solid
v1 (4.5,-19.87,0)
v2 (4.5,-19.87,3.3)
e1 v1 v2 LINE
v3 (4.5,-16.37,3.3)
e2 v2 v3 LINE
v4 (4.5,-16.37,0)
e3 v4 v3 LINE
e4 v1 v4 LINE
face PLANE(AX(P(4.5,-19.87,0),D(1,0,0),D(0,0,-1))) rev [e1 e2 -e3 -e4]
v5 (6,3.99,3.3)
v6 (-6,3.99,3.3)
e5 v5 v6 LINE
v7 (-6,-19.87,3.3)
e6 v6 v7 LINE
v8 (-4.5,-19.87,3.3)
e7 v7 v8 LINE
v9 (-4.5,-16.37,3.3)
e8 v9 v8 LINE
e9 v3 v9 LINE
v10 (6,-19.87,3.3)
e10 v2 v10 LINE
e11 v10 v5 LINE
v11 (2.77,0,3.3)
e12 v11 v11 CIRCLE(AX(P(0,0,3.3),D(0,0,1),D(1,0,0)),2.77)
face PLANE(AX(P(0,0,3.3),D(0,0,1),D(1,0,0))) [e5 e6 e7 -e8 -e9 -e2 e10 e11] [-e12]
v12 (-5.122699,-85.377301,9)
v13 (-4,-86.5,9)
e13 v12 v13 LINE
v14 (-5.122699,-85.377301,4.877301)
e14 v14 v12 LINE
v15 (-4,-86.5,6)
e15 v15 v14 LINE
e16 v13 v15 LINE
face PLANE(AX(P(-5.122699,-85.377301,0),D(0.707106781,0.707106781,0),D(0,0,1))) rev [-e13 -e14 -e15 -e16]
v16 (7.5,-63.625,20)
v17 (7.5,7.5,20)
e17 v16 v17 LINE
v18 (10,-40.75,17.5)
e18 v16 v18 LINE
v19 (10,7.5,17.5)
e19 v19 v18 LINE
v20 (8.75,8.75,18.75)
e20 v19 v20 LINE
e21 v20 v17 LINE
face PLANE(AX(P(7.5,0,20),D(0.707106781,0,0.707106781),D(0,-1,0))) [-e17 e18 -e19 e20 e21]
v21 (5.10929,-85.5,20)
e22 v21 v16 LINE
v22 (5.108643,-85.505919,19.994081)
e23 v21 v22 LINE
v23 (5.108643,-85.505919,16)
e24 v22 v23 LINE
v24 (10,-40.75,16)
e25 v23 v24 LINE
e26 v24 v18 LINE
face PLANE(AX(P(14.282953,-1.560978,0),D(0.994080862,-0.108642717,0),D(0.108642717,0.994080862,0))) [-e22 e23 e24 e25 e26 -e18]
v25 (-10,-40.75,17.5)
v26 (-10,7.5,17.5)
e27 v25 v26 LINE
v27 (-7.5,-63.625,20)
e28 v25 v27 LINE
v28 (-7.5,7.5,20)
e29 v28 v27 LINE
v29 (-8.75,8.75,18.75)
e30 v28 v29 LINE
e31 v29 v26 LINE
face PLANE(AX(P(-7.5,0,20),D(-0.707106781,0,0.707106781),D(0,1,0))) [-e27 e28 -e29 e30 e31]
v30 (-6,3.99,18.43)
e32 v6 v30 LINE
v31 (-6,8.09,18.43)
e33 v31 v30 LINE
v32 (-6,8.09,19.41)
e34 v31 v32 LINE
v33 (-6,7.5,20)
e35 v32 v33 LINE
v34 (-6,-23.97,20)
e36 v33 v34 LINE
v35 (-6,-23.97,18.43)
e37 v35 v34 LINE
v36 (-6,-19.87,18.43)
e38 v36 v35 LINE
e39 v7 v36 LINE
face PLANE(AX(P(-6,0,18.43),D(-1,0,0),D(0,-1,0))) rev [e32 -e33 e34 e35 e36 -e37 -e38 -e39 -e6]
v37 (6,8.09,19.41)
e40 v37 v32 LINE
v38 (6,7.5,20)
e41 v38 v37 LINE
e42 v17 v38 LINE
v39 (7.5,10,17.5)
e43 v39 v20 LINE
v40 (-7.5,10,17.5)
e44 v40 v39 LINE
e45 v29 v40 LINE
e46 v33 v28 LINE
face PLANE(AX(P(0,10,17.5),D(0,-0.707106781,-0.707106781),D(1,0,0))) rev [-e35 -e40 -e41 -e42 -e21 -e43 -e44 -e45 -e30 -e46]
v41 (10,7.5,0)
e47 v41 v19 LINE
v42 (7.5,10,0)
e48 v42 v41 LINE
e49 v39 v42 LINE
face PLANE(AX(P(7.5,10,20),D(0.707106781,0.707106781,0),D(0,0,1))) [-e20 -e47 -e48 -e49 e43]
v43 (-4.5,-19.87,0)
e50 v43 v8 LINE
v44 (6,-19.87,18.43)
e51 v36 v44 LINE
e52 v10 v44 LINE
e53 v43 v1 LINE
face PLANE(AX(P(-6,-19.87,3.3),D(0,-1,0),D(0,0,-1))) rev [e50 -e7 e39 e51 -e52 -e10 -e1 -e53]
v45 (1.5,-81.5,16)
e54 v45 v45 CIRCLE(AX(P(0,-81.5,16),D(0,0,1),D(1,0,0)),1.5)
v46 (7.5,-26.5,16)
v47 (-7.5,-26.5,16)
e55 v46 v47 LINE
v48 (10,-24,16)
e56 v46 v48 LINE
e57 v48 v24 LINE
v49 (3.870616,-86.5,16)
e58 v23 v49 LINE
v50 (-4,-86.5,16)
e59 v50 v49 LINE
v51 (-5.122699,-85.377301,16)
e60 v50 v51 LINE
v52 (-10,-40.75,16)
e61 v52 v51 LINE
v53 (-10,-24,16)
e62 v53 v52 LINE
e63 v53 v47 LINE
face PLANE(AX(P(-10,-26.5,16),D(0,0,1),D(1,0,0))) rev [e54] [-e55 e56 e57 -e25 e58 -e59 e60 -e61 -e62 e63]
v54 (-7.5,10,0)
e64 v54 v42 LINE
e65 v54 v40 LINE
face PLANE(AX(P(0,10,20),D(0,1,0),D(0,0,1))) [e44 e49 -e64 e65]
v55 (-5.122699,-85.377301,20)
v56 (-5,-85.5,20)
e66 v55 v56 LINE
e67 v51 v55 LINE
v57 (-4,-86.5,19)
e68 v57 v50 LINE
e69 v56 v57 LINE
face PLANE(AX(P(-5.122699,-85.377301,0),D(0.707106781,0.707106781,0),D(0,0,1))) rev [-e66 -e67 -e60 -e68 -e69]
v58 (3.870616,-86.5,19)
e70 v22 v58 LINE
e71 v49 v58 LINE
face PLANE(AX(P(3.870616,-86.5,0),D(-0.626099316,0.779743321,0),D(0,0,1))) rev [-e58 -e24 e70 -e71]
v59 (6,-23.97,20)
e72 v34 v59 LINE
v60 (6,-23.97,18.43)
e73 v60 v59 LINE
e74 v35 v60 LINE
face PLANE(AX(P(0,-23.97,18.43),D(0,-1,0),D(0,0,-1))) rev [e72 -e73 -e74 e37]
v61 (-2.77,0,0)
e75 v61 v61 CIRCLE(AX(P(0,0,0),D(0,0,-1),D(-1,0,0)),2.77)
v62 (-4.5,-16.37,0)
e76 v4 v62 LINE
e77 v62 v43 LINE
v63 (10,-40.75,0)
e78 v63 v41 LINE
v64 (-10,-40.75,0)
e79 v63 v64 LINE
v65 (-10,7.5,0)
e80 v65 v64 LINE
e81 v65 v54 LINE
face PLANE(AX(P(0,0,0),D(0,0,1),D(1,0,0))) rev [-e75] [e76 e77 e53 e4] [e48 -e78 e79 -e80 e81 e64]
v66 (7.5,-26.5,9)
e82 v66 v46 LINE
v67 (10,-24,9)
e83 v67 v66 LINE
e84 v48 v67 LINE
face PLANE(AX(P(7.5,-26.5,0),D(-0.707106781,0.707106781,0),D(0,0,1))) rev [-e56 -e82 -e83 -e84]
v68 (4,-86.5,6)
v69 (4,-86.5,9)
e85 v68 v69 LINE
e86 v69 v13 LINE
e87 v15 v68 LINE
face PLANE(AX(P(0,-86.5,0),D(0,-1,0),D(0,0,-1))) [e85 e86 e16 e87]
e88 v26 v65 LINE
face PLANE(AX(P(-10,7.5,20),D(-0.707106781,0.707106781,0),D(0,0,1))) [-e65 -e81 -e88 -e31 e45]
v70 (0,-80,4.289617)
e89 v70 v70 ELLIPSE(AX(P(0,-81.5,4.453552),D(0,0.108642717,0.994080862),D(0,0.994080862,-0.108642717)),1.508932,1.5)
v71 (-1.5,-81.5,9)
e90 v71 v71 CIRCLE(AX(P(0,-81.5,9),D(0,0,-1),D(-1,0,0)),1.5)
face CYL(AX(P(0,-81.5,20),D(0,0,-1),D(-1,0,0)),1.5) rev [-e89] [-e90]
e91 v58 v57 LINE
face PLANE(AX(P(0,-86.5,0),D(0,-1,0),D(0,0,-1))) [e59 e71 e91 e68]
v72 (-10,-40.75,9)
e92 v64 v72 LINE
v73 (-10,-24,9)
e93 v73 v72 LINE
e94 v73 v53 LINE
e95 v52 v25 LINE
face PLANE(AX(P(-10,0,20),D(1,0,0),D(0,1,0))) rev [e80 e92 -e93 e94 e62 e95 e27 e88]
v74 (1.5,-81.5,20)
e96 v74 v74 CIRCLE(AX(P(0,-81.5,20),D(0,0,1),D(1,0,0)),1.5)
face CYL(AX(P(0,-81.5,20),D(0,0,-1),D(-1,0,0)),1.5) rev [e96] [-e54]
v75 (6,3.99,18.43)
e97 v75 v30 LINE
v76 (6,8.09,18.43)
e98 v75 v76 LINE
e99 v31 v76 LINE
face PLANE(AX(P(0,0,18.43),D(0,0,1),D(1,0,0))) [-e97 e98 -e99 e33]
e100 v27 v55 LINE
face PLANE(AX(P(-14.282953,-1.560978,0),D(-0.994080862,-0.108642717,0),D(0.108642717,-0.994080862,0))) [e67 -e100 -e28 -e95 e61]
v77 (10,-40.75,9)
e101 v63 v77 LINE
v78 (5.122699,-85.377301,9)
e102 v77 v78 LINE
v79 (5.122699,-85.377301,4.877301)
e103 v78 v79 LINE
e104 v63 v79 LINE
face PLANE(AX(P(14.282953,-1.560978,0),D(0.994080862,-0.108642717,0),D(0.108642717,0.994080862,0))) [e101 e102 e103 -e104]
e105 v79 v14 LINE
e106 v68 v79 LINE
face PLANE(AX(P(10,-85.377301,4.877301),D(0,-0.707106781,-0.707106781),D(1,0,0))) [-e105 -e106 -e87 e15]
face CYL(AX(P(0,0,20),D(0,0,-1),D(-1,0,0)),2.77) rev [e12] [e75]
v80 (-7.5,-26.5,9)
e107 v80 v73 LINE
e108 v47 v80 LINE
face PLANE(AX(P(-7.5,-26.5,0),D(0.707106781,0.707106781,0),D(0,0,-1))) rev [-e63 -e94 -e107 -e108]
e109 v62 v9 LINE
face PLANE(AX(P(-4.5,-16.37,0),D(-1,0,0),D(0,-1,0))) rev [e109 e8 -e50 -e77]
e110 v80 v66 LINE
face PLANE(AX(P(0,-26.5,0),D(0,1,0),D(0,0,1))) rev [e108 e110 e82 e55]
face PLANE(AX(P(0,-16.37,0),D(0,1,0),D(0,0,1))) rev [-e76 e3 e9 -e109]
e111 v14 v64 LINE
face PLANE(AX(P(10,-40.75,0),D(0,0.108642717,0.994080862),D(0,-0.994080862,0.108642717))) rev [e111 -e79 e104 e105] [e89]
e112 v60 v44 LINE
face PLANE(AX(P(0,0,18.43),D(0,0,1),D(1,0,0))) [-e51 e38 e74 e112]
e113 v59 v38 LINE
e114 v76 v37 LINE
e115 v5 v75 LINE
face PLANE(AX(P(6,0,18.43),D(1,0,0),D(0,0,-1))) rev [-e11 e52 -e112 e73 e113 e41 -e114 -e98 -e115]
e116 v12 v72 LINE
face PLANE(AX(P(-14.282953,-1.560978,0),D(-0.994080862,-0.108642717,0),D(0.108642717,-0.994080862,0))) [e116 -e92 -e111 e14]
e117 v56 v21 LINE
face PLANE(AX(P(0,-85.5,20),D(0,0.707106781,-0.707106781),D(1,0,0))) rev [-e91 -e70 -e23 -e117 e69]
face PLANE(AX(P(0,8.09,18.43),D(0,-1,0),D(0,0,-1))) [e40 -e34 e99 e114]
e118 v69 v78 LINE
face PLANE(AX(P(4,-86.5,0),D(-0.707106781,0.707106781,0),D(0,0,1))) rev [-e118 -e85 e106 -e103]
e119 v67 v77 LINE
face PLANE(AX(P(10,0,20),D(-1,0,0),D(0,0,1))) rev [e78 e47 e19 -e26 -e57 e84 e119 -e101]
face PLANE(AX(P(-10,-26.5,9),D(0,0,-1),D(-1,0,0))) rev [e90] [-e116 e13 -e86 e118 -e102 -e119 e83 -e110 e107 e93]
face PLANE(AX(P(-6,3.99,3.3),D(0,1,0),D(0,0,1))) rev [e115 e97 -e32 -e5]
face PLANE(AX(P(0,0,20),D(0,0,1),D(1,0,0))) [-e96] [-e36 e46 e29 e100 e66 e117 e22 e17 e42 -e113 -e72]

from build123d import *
from OCP.BRepFilletAPI import BRepFilletAPI_MakeChamfer

# Parameters (mm, degrees)
SKETCH1_W             = 20
SKETCH1_H             = 81.5
SKETCH1_R             = 1.5
SKETCH1_H_2           = 20
BOSS_EXTRUDE1_DEPTH   = 20
CHAMFER1_SIZE         = 2.5
SKETCH2_W             = 20
SKETCH2_H             = 7
CUT_EXTRUDE1_DEPTH    = 65
CHAMFER2_SIZE         = 2.5
CUT_EXTRUDE2_DEPTH    = 1.57
CHAMFER3_SIZE         = 2.5
SKETCH4_W             = 12
SKETCH4_H             = 23.86
CUT_EXTRUDE3_DEPTH    = 15.13
CUT_EXTRUDE4_DEPTH    = 94.547528027
SKETCH6_R             = 2.77
CUT_EXTRUDE5_DEPTH    = 95.192621792
CUT_EXTRUDE6_DEPTH    = 95.192621792
CHAMFER8_SIZE         = 1
CHAMFER8_SIZE2        = 1.129384369
CUT_EXTRUDE7_DEPTH    = 92.006867873
CHAMFER9_SIZE         = 1
CHAMFER9_SIZE2        = 1.129384369
CHAMFER9_EDGE_2_SIZE  = 1
CHAMFER9_EDGE_2_SIZE2 = 1.129384369
CHAMFER9_EDGE_3_SIZE  = 1
CHAMFER9_EDGE_3_SIZE2 = 1.129384369


with BuildPart() as part:
    # Sketch1 → Boss-Extrude1 (new body)
    # profile 1 of 2: a face of its own
    with BuildSketch(Plane.XY):
        with Locations((0, -50.75)):
            Rectangle(SKETCH1_W, SKETCH1_H)
        with Locations((0, -81.5)):
            Circle(SKETCH1_R, mode=Mode.SUBTRACT)
    # profile 2 of 2: a face of its own
    with BuildSketch(Plane.XY):
        Rectangle(SKETCH1_W, SKETCH1_H_2)
    extrude(amount=BOSS_EXTRUDE1_DEPTH)

    # Chamfer1
    chamfer1_edges = [part.edges().sort_by_distance(p)[0] for p in [
        (0, -91.5, 20),
        (-10, -91.5, 10),
        (-10, 10, 10),
        (10, 10, 10),
        (10, -91.5, 10),
        (10, -40.75, 20),
        (-10, -40.75, 20),
        (0, -91.5, 0),
    ]]
    chamfer(chamfer1_edges, length=CHAMFER1_SIZE)

    # Sketch2 → Cut-Extrude1 (cut)
    with BuildSketch(Plane.XZ.offset(91.5)):
        with Locations((0, 12.5)):
            Rectangle(SKETCH2_W, SKETCH2_H)
    extrude(amount=-CUT_EXTRUDE1_DEPTH, mode=Mode.SUBTRACT)

    # Chamfer2
    chamfer2_edges = [part.edges().sort_by_distance(p)[0] for p in [
        (10, -26.5, 12.5),
        (-10, -26.5, 12.5),
    ]]
    chamfer(chamfer2_edges, length=CHAMFER2_SIZE)

    # Sketch3 → Cut-Extrude2 (cut)
    with BuildSketch(Plane.XY.offset(20)):
        Polygon((0, -19.84), (0, -14), (0, 3.96), (0, 8.09), (-6, 8.09), (-6, -23.97), (0, -23.97), align=None)
        Polygon((0, 3.96), (0, -14), (0, -19.84), (0, -23.97), (6, -23.97), (6, 8.09), (0, 8.09), align=None)
    extrude(amount=-CUT_EXTRUDE2_DEPTH, mode=Mode.SUBTRACT)

    # Chamfer3
    # the kernel refuses this chamfer: 2.5 mm, written as the material it takes off along each edge
    with BuildSketch(Plane(origin=(13.92920747, 10, 20), x_dir=(0, -0.9996219169112968, 0.027495876610586317), z_dir=(-1, 0, 0))) as chamfer3_piece_1:
        Polygon((CHAMFER3_SIZE * 0.999621916911, -CHAMFER3_SIZE * 0.0274958766106), (-CHAMFER3_SIZE * 0.0274958766106, -CHAMFER3_SIZE * 0.999621916911), (0, 0), align=None)
    extrude(amount=27.85841494, mode=Mode.SUBTRACT)

    # Sketch4 → Cut-Extrude3 (cut)
    with BuildSketch(Plane.XY.offset(18.43)):
        with Locations((0, -7.94)):
            Rectangle(SKETCH4_W, SKETCH4_H)
    extrude(amount=-CUT_EXTRUDE3_DEPTH, mode=Mode.SUBTRACT)

    # Sketch5 → Cut-Extrude4 (cut, through all)
    with BuildSketch(Plane.XY.offset(3.3)):
        Polygon((0, -19.87), (4.5, -19.87), (4.5, -16.37), (0, -16.37), (-4.5, -16.37), (-4.5, -19.87), align=None)
    extrude(amount=-CUT_EXTRUDE4_DEPTH, mode=Mode.SUBTRACT)

    # Sketch6 → Cut-Extrude5 (cut, through all)
    with BuildSketch(Plane(origin=(0, 0, 0), x_dir=(-1, 0, 0), z_dir=(0, 0, -1))):
        Circle(SKETCH6_R)
    extrude(amount=-CUT_EXTRUDE5_DEPTH, mode=Mode.SUBTRACT)

    # Sketch7 → Cut-Extrude6 (cut, through all)
    with BuildSketch(Plane.XY.offset(20)):
        Polygon((-5, -86.5), (-7.5, -63.625), (-7.5, -89), (7.5, -89), (7.5, -63.625), (5, -86.5), align=None)
        Polygon((-7.5, -63.625), (-10, -40.75), (-10, -91.5), (10, -91.5), (10, -40.75), (7.5, -63.625), (7.5, -89), (-7.5, -89), align=None)
    extrude(amount=-CUT_EXTRUDE6_DEPTH, mode=Mode.SUBTRACT)

    # Chamfer8: one chamfer whose edges measure the first distance from different faces: ONE call of the kernel's chamfer builder (chamfer() names one face for all edges)
    chamfer8_edges_1 = [part.edges().sort_by_distance(p)[0] for p in [
        (-5, -86.5, 18),
    ]]
    chamfer8_side_1 = [part.faces().sort_by_distance(p)[0] for p in [
        (0, -86.5, 18),
    ]]
    chamfer8_edges_2 = [part.edges().sort_by_distance(p)[0] for p in [
        (0, -86.5, 20),
    ]]
    chamfer8_edges_3 = [part.edges().sort_by_distance(p)[0] for p in [
        (5, -86.5, 18),
    ]]
    chamfer8_side_3 = [part.faces().sort_by_distance(p)[0] for p in [
        (7.191358025, -66.449074074, 17.783950617),
    ]]
    chamfer8 = BRepFilletAPI_MakeChamfer(part.part.solid().wrapped)
    for e in chamfer8_edges_1:
        chamfer8.Add(CHAMFER8_SIZE, CHAMFER8_SIZE2, e.wrapped, chamfer8_side_1[0].wrapped)  # the first distance lies on this face
    for e in chamfer8_edges_2:
        chamfer8.Add(CHAMFER8_SIZE, e.wrapped)
    for e in chamfer8_edges_3:
        chamfer8.Add(CHAMFER8_SIZE, CHAMFER8_SIZE2, e.wrapped, chamfer8_side_3[0].wrapped)  # the first distance lies on this face
    add(Compound.cast(chamfer8.Shape()), mode=Mode.REPLACE)

    # Sketch8 → Cut-Extrude7 (cut, through all)
    with BuildSketch(Plane.ZY.offset(10)):
        Polygon((0, -40.75), (5, -86.5), (0, -86.5), align=None)
    extrude(amount=-CUT_EXTRUDE7_DEPTH, mode=Mode.SUBTRACT)

    # Chamfer9
    chamfer9_edges = [part.edges().sort_by_distance(p)[0] for p in [
        (-5, -86.5, 7),
    ]]
    chamfer9_side = [part.faces().sort_by_distance(p)[0] for p in [
        (0, -86.5, 7),
    ]]
    chamfer(chamfer9_edges, length=CHAMFER9_SIZE, length2=CHAMFER9_SIZE2, reference=chamfer9_side[0])

    # Chamfer9 edge 2
    chamfer9_edge_2_edges = [part.edges().sort_by_distance(p)[0] for p in [
        (5, -86.5, 7),
    ]]
    chamfer9_edge_2_side = [part.faces().sort_by_distance(p)[0] for p in [
        (0, -86.5, 7),
    ]]
    chamfer(chamfer9_edge_2_edges, length=CHAMFER9_EDGE_2_SIZE, length2=CHAMFER9_EDGE_2_SIZE2, reference=chamfer9_edge_2_side[0])

    # Chamfer9 edge 3
    chamfer9_edge_3_edges = [part.edges().sort_by_distance(p)[0] for p in [
        (0, -86.5, 5),
    ]]
    chamfer9_edge_3_side = [part.faces().sort_by_distance(p)[0] for p in [
        (0, -86.5, 7),
    ]]
    chamfer(chamfer9_edge_3_edges, length=CHAMFER9_EDGE_3_SIZE, length2=CHAMFER9_EDGE_3_SIZE2, reference=chamfer9_edge_3_side[0])


solid = part.part
